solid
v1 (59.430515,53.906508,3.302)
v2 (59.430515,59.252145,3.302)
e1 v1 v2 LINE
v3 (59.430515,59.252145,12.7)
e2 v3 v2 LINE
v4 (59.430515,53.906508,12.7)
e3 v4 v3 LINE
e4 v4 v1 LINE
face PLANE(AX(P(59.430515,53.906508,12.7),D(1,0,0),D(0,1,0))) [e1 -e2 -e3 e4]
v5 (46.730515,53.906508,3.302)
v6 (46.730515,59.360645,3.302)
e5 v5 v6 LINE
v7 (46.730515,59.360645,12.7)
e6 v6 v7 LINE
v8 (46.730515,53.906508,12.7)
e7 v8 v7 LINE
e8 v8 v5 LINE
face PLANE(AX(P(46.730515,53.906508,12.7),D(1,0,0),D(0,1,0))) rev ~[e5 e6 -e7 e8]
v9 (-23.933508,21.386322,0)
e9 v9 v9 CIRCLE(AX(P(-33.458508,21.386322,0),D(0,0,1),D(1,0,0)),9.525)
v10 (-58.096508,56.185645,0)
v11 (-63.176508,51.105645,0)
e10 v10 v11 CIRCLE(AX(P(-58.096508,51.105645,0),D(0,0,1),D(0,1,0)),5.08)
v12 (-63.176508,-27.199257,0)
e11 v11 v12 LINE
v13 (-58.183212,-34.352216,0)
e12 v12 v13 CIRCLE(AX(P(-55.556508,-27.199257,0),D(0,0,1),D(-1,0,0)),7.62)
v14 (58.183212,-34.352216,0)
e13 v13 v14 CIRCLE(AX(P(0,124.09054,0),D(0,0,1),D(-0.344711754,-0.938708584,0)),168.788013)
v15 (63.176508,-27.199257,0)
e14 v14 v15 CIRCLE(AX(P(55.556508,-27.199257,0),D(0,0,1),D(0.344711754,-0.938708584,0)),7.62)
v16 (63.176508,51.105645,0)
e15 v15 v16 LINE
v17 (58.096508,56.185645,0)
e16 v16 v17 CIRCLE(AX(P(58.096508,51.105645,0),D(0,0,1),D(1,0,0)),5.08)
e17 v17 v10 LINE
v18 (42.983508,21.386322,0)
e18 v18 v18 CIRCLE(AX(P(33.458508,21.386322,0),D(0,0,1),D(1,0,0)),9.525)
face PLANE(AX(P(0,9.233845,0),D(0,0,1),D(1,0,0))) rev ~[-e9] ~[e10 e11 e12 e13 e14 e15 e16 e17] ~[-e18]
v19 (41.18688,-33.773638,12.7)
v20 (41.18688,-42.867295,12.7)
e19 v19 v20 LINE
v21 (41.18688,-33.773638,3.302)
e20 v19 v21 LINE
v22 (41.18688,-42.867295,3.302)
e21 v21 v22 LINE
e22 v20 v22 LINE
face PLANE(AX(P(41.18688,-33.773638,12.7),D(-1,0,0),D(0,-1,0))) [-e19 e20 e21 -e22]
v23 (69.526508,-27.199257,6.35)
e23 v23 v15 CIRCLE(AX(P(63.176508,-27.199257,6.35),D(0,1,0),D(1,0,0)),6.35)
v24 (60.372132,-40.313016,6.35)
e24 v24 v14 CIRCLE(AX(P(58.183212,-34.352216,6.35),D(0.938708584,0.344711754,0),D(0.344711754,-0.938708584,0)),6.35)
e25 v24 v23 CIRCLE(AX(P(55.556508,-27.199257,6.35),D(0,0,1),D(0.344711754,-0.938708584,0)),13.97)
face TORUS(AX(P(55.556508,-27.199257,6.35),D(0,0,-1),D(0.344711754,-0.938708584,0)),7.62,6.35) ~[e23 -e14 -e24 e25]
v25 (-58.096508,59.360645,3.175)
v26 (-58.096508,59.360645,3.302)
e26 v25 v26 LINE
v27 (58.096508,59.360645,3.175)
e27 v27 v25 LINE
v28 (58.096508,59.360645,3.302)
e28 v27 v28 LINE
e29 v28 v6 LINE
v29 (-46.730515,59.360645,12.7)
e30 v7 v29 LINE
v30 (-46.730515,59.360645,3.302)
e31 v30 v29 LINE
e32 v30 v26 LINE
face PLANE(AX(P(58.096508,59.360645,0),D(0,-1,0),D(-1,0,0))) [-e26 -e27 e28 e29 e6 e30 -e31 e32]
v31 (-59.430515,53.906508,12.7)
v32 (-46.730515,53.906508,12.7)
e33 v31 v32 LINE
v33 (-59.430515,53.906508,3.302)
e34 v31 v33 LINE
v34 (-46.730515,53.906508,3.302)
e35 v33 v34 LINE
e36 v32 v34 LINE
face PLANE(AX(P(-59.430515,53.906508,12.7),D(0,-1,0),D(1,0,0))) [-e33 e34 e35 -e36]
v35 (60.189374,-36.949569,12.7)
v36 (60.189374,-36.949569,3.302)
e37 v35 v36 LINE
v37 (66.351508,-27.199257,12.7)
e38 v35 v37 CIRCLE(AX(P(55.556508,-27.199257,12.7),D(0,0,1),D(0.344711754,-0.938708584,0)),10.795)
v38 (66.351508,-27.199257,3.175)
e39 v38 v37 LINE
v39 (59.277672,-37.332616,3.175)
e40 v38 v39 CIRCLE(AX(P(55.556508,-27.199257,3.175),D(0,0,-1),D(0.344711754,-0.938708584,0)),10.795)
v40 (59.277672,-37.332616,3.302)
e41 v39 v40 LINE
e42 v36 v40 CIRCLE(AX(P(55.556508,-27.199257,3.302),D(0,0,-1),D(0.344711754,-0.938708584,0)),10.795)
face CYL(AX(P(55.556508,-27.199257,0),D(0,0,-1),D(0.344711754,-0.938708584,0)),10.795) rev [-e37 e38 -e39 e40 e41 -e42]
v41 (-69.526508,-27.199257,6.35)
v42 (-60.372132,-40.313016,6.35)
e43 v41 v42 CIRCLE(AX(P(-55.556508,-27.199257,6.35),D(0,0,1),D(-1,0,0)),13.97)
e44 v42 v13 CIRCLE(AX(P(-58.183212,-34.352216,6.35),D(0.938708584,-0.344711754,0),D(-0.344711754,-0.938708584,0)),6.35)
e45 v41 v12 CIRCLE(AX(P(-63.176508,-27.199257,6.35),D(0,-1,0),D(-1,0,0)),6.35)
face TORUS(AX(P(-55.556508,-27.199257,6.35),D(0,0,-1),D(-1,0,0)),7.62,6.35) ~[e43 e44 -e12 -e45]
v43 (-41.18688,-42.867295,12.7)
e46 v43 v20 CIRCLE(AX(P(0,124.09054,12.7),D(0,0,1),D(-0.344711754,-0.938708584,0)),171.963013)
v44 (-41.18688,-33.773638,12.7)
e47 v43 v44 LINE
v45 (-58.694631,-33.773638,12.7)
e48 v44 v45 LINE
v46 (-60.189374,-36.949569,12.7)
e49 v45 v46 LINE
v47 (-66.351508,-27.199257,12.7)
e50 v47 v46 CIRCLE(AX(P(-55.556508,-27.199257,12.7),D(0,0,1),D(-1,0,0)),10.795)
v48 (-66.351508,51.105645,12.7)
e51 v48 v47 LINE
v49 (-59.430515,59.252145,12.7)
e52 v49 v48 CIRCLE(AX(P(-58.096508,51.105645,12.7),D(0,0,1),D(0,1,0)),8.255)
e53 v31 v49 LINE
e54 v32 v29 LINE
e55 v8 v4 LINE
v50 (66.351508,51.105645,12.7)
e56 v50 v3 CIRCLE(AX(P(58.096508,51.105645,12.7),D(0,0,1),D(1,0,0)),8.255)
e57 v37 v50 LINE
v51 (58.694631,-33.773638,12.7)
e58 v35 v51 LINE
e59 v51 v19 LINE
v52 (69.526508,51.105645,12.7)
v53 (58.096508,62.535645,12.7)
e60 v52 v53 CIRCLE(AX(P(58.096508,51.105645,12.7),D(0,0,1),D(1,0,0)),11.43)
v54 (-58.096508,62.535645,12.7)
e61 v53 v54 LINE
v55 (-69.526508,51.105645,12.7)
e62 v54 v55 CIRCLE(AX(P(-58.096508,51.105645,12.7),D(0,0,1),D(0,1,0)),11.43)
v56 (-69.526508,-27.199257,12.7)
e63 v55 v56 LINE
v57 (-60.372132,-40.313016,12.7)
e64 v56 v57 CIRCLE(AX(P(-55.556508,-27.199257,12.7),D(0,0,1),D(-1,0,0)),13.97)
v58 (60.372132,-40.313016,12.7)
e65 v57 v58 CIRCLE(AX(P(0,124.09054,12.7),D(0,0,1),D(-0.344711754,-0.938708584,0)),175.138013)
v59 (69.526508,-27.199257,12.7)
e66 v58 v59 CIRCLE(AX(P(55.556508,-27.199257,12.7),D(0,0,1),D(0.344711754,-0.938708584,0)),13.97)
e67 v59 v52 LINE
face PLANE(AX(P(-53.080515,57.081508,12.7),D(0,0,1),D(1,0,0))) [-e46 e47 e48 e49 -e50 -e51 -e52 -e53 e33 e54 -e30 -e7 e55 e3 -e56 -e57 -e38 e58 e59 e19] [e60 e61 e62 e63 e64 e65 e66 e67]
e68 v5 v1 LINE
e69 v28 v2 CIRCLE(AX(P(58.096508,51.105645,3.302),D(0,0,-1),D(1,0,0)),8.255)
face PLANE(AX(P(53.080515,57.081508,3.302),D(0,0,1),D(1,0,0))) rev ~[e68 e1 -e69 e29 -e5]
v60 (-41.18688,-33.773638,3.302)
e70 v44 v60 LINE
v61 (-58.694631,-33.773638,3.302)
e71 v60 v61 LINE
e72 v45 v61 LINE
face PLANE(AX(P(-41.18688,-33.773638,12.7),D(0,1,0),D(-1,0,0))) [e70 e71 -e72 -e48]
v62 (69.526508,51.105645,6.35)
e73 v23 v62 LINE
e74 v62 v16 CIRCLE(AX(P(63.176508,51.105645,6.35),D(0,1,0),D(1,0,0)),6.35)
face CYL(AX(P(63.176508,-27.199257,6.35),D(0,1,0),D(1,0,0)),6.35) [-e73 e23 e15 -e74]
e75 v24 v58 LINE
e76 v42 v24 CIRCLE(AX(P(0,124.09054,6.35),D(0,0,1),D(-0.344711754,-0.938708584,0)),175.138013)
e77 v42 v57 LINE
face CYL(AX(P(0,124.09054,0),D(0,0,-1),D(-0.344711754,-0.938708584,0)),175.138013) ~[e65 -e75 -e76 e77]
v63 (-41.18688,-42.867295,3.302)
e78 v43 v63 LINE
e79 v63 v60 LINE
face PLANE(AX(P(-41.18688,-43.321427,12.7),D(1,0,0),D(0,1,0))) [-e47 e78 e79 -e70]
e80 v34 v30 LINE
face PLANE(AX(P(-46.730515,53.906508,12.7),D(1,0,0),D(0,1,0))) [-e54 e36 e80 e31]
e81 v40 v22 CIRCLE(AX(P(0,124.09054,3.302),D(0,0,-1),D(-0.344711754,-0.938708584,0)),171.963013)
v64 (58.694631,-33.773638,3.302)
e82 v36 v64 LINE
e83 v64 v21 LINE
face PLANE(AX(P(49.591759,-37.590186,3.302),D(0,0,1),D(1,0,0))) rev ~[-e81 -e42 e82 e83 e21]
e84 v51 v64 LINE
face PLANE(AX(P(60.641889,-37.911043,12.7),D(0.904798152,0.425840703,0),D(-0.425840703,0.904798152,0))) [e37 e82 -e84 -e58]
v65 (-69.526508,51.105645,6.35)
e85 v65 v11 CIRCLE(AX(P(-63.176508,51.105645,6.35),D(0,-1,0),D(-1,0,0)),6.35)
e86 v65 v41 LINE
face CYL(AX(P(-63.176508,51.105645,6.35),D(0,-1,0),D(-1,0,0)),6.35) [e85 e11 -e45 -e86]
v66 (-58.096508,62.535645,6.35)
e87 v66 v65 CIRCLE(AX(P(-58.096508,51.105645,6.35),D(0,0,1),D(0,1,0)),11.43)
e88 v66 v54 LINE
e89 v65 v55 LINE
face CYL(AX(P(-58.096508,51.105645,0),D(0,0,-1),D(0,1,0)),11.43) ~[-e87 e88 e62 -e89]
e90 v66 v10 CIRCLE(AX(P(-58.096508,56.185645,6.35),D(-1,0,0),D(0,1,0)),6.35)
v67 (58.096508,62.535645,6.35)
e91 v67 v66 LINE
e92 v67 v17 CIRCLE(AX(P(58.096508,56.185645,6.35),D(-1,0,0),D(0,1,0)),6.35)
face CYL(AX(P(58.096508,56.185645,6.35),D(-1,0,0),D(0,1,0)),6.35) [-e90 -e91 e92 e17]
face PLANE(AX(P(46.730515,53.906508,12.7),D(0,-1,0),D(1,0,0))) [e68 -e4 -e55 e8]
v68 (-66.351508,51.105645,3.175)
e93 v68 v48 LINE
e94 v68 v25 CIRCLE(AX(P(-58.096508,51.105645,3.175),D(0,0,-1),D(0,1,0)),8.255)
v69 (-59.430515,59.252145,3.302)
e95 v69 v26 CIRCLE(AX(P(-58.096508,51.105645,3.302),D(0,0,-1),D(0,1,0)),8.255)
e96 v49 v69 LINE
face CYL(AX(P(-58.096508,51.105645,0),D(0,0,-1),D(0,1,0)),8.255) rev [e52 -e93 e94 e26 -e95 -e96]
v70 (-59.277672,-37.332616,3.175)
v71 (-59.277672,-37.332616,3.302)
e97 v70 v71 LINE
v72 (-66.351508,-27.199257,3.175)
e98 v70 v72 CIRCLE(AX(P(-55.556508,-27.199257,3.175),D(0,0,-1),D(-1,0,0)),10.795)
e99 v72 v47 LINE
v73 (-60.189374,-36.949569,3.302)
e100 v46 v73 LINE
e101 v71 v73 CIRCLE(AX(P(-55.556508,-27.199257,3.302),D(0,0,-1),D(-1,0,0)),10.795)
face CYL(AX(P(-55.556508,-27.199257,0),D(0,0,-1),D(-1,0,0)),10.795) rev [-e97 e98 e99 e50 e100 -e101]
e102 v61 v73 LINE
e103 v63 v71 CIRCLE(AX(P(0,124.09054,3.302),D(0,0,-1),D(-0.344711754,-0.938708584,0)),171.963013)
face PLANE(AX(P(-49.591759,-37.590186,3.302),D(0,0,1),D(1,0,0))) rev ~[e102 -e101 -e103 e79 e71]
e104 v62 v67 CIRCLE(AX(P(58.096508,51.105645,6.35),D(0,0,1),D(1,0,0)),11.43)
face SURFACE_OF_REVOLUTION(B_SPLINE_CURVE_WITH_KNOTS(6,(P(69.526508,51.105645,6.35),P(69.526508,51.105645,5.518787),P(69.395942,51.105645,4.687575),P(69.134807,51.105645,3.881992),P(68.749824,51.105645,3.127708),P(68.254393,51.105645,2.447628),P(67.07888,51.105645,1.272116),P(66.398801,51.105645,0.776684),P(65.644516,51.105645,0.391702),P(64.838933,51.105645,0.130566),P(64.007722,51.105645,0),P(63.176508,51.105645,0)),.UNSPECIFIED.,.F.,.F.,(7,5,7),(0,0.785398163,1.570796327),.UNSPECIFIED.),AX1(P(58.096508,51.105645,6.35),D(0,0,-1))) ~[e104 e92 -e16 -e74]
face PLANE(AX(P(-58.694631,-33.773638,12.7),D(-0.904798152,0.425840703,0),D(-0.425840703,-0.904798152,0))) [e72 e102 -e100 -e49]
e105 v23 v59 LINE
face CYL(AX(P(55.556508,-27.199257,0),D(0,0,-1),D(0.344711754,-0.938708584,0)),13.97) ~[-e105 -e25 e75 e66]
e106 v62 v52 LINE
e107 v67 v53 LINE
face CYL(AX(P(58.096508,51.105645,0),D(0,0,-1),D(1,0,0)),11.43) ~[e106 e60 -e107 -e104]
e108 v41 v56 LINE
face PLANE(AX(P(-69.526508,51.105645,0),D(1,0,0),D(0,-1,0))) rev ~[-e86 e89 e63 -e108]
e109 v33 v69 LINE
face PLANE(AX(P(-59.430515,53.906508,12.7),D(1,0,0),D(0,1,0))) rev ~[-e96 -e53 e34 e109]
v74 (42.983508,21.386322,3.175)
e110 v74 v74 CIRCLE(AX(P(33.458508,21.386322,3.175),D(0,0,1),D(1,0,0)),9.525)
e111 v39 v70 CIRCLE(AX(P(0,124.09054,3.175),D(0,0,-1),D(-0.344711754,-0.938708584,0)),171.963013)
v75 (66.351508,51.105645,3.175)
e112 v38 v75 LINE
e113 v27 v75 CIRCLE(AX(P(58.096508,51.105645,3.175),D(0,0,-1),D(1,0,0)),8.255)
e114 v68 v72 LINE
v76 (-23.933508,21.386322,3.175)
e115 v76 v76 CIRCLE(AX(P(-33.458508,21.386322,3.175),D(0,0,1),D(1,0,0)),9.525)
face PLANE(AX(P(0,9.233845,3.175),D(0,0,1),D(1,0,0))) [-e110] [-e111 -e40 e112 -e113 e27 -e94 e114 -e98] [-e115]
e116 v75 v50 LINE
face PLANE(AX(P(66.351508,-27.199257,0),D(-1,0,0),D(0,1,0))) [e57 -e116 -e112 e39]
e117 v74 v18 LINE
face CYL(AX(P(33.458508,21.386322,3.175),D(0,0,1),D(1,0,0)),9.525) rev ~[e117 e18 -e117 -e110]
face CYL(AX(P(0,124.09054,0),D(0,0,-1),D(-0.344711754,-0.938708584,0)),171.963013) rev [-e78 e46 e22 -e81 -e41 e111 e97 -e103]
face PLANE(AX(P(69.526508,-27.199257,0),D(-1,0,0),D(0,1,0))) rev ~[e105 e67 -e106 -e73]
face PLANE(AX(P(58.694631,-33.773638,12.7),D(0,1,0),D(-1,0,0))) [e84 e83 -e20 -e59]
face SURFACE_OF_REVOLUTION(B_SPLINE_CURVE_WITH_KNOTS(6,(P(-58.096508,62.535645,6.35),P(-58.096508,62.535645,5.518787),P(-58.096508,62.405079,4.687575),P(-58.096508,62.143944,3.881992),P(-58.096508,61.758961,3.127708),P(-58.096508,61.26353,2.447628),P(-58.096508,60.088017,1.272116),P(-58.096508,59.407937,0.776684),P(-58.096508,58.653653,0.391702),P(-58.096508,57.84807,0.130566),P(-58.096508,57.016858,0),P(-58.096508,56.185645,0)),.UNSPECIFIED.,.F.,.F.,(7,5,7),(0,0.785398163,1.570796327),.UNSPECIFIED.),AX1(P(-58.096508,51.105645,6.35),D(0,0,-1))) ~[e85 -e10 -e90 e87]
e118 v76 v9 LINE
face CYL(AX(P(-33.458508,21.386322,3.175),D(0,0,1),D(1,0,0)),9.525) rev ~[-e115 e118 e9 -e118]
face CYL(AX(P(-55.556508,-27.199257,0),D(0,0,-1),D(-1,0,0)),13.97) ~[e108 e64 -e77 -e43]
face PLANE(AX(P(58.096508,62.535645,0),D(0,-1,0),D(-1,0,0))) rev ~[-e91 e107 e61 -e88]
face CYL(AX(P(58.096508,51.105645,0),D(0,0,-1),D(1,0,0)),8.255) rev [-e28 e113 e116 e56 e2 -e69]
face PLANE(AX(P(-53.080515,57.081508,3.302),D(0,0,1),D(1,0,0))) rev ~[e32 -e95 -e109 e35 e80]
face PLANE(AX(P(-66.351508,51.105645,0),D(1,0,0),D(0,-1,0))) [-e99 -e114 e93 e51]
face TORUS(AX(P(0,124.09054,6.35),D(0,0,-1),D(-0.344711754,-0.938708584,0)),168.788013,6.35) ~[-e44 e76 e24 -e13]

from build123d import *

# Parameters (mm, degrees)
F1_DEPTH = 12.7
F2_T     = -3.175
F3_R     = 6.35
F5_W     = 12.7
F5_H     = 6.35
F6_DEPTH = 9.398
F7_R     = 9.525
F8_DEPTH = 25.4


# Not quite as in the source:
# - a feature names something its author has since deleted; it is built from what else it names


with BuildPart() as f1:
    # F0 (on Top) → F1 (new body)
    with BuildSketch(Plane.XY):
        with BuildLine():
            Line((58.0965084505, 62.5356453779), (-58.0965084505, 62.5356453779))
            ThreePointArc((-58.0965084505, 62.5356453779), (-66.1787389595, 59.1878758868), (-69.5265084505, 51.1056453779))
            Line((-69.5265084505, 51.1056453779), (-69.5265084505, -27.1992570698))
            ThreePointArc((-69.5265084505, -27.1992570698), (-67.0115325937, -35.1957139026), (-60.3721316603, -40.3130159932))
            ThreePointArc((-60.3721316603, -40.3130159932), (0, -51.0474727306), (60.3721316603, -40.3130159932))
            ThreePointArc((60.3721316603, -40.3130159932), (67.0115325937, -35.1957139026), (69.5265084505, -27.1992570698))
            Line((69.5265084505, -27.1992570698), (69.5265084505, 51.1056453779))
            ThreePointArc((69.5265084505, 51.1056453779), (66.1787389595, 59.1878758868), (58.0965084505, 62.5356453779))
        make_face()
    extrude(amount=F1_DEPTH)

    # F2
    f2_openings = [f1.faces().sort_by_distance(p)[0] for p in [
        (0, 7.919531, 12.7),
    ]]
    offset(amount=F2_T, openings=f2_openings)

    # F3
    f3_edges = [f1.edges().sort_by_distance(p)[0] for p in [
        (69.526508, 11.953194, 0),
        (66.178739, 59.187876, 0),
        (0, 62.535645, 0),
        (-66.178739, 59.187876, 0),
        (-69.526508, 11.953194, 0),
        (-67.011533, -35.195714, 0),
        (0, -51.047473, 0),
        (67.011533, -35.195714, 0),
    ]]
    fillet(f3_edges, radius=F3_R)

    # F5 (on offset) → F6 (join)
    with BuildSketch(Plane.XY.offset(12.7)):
        with Locations((-53.0805146158, 57.0815077901)):
            Rectangle(F5_W, F5_H)
        with Locations((53.0805146158, 57.0815077901)):
            Rectangle(F5_W, F5_H)
        Polygon((-41.1868803203, -33.773638308), (-58.6946308613, -33.773638308), (-60.6418885291, -37.9110425711), (-53.9016760886, -40.266495198), (-41.1868803203, -43.3214269578), align=None)
        Polygon((60.6418885291, -37.9110425711), (58.6946308613, -33.773638308), (41.1868803203, -33.773638308), (41.1868803203, -43.3214269578), (53.9016760886, -40.266495198), align=None)
    extrude(amount=-F6_DEPTH)

    # F7 (on face) → F8 (cut)
    with BuildSketch(Plane.XY.offset(3.175)):
        with Locations((-33.4585084505, 21.3863216341)):
            Circle(F7_R)
        with Locations((33.4585084505, 21.3863216341)):
            Circle(F7_R)
    extrude(amount=-F8_DEPTH, mode=Mode.SUBTRACT)


solid = f1.part
